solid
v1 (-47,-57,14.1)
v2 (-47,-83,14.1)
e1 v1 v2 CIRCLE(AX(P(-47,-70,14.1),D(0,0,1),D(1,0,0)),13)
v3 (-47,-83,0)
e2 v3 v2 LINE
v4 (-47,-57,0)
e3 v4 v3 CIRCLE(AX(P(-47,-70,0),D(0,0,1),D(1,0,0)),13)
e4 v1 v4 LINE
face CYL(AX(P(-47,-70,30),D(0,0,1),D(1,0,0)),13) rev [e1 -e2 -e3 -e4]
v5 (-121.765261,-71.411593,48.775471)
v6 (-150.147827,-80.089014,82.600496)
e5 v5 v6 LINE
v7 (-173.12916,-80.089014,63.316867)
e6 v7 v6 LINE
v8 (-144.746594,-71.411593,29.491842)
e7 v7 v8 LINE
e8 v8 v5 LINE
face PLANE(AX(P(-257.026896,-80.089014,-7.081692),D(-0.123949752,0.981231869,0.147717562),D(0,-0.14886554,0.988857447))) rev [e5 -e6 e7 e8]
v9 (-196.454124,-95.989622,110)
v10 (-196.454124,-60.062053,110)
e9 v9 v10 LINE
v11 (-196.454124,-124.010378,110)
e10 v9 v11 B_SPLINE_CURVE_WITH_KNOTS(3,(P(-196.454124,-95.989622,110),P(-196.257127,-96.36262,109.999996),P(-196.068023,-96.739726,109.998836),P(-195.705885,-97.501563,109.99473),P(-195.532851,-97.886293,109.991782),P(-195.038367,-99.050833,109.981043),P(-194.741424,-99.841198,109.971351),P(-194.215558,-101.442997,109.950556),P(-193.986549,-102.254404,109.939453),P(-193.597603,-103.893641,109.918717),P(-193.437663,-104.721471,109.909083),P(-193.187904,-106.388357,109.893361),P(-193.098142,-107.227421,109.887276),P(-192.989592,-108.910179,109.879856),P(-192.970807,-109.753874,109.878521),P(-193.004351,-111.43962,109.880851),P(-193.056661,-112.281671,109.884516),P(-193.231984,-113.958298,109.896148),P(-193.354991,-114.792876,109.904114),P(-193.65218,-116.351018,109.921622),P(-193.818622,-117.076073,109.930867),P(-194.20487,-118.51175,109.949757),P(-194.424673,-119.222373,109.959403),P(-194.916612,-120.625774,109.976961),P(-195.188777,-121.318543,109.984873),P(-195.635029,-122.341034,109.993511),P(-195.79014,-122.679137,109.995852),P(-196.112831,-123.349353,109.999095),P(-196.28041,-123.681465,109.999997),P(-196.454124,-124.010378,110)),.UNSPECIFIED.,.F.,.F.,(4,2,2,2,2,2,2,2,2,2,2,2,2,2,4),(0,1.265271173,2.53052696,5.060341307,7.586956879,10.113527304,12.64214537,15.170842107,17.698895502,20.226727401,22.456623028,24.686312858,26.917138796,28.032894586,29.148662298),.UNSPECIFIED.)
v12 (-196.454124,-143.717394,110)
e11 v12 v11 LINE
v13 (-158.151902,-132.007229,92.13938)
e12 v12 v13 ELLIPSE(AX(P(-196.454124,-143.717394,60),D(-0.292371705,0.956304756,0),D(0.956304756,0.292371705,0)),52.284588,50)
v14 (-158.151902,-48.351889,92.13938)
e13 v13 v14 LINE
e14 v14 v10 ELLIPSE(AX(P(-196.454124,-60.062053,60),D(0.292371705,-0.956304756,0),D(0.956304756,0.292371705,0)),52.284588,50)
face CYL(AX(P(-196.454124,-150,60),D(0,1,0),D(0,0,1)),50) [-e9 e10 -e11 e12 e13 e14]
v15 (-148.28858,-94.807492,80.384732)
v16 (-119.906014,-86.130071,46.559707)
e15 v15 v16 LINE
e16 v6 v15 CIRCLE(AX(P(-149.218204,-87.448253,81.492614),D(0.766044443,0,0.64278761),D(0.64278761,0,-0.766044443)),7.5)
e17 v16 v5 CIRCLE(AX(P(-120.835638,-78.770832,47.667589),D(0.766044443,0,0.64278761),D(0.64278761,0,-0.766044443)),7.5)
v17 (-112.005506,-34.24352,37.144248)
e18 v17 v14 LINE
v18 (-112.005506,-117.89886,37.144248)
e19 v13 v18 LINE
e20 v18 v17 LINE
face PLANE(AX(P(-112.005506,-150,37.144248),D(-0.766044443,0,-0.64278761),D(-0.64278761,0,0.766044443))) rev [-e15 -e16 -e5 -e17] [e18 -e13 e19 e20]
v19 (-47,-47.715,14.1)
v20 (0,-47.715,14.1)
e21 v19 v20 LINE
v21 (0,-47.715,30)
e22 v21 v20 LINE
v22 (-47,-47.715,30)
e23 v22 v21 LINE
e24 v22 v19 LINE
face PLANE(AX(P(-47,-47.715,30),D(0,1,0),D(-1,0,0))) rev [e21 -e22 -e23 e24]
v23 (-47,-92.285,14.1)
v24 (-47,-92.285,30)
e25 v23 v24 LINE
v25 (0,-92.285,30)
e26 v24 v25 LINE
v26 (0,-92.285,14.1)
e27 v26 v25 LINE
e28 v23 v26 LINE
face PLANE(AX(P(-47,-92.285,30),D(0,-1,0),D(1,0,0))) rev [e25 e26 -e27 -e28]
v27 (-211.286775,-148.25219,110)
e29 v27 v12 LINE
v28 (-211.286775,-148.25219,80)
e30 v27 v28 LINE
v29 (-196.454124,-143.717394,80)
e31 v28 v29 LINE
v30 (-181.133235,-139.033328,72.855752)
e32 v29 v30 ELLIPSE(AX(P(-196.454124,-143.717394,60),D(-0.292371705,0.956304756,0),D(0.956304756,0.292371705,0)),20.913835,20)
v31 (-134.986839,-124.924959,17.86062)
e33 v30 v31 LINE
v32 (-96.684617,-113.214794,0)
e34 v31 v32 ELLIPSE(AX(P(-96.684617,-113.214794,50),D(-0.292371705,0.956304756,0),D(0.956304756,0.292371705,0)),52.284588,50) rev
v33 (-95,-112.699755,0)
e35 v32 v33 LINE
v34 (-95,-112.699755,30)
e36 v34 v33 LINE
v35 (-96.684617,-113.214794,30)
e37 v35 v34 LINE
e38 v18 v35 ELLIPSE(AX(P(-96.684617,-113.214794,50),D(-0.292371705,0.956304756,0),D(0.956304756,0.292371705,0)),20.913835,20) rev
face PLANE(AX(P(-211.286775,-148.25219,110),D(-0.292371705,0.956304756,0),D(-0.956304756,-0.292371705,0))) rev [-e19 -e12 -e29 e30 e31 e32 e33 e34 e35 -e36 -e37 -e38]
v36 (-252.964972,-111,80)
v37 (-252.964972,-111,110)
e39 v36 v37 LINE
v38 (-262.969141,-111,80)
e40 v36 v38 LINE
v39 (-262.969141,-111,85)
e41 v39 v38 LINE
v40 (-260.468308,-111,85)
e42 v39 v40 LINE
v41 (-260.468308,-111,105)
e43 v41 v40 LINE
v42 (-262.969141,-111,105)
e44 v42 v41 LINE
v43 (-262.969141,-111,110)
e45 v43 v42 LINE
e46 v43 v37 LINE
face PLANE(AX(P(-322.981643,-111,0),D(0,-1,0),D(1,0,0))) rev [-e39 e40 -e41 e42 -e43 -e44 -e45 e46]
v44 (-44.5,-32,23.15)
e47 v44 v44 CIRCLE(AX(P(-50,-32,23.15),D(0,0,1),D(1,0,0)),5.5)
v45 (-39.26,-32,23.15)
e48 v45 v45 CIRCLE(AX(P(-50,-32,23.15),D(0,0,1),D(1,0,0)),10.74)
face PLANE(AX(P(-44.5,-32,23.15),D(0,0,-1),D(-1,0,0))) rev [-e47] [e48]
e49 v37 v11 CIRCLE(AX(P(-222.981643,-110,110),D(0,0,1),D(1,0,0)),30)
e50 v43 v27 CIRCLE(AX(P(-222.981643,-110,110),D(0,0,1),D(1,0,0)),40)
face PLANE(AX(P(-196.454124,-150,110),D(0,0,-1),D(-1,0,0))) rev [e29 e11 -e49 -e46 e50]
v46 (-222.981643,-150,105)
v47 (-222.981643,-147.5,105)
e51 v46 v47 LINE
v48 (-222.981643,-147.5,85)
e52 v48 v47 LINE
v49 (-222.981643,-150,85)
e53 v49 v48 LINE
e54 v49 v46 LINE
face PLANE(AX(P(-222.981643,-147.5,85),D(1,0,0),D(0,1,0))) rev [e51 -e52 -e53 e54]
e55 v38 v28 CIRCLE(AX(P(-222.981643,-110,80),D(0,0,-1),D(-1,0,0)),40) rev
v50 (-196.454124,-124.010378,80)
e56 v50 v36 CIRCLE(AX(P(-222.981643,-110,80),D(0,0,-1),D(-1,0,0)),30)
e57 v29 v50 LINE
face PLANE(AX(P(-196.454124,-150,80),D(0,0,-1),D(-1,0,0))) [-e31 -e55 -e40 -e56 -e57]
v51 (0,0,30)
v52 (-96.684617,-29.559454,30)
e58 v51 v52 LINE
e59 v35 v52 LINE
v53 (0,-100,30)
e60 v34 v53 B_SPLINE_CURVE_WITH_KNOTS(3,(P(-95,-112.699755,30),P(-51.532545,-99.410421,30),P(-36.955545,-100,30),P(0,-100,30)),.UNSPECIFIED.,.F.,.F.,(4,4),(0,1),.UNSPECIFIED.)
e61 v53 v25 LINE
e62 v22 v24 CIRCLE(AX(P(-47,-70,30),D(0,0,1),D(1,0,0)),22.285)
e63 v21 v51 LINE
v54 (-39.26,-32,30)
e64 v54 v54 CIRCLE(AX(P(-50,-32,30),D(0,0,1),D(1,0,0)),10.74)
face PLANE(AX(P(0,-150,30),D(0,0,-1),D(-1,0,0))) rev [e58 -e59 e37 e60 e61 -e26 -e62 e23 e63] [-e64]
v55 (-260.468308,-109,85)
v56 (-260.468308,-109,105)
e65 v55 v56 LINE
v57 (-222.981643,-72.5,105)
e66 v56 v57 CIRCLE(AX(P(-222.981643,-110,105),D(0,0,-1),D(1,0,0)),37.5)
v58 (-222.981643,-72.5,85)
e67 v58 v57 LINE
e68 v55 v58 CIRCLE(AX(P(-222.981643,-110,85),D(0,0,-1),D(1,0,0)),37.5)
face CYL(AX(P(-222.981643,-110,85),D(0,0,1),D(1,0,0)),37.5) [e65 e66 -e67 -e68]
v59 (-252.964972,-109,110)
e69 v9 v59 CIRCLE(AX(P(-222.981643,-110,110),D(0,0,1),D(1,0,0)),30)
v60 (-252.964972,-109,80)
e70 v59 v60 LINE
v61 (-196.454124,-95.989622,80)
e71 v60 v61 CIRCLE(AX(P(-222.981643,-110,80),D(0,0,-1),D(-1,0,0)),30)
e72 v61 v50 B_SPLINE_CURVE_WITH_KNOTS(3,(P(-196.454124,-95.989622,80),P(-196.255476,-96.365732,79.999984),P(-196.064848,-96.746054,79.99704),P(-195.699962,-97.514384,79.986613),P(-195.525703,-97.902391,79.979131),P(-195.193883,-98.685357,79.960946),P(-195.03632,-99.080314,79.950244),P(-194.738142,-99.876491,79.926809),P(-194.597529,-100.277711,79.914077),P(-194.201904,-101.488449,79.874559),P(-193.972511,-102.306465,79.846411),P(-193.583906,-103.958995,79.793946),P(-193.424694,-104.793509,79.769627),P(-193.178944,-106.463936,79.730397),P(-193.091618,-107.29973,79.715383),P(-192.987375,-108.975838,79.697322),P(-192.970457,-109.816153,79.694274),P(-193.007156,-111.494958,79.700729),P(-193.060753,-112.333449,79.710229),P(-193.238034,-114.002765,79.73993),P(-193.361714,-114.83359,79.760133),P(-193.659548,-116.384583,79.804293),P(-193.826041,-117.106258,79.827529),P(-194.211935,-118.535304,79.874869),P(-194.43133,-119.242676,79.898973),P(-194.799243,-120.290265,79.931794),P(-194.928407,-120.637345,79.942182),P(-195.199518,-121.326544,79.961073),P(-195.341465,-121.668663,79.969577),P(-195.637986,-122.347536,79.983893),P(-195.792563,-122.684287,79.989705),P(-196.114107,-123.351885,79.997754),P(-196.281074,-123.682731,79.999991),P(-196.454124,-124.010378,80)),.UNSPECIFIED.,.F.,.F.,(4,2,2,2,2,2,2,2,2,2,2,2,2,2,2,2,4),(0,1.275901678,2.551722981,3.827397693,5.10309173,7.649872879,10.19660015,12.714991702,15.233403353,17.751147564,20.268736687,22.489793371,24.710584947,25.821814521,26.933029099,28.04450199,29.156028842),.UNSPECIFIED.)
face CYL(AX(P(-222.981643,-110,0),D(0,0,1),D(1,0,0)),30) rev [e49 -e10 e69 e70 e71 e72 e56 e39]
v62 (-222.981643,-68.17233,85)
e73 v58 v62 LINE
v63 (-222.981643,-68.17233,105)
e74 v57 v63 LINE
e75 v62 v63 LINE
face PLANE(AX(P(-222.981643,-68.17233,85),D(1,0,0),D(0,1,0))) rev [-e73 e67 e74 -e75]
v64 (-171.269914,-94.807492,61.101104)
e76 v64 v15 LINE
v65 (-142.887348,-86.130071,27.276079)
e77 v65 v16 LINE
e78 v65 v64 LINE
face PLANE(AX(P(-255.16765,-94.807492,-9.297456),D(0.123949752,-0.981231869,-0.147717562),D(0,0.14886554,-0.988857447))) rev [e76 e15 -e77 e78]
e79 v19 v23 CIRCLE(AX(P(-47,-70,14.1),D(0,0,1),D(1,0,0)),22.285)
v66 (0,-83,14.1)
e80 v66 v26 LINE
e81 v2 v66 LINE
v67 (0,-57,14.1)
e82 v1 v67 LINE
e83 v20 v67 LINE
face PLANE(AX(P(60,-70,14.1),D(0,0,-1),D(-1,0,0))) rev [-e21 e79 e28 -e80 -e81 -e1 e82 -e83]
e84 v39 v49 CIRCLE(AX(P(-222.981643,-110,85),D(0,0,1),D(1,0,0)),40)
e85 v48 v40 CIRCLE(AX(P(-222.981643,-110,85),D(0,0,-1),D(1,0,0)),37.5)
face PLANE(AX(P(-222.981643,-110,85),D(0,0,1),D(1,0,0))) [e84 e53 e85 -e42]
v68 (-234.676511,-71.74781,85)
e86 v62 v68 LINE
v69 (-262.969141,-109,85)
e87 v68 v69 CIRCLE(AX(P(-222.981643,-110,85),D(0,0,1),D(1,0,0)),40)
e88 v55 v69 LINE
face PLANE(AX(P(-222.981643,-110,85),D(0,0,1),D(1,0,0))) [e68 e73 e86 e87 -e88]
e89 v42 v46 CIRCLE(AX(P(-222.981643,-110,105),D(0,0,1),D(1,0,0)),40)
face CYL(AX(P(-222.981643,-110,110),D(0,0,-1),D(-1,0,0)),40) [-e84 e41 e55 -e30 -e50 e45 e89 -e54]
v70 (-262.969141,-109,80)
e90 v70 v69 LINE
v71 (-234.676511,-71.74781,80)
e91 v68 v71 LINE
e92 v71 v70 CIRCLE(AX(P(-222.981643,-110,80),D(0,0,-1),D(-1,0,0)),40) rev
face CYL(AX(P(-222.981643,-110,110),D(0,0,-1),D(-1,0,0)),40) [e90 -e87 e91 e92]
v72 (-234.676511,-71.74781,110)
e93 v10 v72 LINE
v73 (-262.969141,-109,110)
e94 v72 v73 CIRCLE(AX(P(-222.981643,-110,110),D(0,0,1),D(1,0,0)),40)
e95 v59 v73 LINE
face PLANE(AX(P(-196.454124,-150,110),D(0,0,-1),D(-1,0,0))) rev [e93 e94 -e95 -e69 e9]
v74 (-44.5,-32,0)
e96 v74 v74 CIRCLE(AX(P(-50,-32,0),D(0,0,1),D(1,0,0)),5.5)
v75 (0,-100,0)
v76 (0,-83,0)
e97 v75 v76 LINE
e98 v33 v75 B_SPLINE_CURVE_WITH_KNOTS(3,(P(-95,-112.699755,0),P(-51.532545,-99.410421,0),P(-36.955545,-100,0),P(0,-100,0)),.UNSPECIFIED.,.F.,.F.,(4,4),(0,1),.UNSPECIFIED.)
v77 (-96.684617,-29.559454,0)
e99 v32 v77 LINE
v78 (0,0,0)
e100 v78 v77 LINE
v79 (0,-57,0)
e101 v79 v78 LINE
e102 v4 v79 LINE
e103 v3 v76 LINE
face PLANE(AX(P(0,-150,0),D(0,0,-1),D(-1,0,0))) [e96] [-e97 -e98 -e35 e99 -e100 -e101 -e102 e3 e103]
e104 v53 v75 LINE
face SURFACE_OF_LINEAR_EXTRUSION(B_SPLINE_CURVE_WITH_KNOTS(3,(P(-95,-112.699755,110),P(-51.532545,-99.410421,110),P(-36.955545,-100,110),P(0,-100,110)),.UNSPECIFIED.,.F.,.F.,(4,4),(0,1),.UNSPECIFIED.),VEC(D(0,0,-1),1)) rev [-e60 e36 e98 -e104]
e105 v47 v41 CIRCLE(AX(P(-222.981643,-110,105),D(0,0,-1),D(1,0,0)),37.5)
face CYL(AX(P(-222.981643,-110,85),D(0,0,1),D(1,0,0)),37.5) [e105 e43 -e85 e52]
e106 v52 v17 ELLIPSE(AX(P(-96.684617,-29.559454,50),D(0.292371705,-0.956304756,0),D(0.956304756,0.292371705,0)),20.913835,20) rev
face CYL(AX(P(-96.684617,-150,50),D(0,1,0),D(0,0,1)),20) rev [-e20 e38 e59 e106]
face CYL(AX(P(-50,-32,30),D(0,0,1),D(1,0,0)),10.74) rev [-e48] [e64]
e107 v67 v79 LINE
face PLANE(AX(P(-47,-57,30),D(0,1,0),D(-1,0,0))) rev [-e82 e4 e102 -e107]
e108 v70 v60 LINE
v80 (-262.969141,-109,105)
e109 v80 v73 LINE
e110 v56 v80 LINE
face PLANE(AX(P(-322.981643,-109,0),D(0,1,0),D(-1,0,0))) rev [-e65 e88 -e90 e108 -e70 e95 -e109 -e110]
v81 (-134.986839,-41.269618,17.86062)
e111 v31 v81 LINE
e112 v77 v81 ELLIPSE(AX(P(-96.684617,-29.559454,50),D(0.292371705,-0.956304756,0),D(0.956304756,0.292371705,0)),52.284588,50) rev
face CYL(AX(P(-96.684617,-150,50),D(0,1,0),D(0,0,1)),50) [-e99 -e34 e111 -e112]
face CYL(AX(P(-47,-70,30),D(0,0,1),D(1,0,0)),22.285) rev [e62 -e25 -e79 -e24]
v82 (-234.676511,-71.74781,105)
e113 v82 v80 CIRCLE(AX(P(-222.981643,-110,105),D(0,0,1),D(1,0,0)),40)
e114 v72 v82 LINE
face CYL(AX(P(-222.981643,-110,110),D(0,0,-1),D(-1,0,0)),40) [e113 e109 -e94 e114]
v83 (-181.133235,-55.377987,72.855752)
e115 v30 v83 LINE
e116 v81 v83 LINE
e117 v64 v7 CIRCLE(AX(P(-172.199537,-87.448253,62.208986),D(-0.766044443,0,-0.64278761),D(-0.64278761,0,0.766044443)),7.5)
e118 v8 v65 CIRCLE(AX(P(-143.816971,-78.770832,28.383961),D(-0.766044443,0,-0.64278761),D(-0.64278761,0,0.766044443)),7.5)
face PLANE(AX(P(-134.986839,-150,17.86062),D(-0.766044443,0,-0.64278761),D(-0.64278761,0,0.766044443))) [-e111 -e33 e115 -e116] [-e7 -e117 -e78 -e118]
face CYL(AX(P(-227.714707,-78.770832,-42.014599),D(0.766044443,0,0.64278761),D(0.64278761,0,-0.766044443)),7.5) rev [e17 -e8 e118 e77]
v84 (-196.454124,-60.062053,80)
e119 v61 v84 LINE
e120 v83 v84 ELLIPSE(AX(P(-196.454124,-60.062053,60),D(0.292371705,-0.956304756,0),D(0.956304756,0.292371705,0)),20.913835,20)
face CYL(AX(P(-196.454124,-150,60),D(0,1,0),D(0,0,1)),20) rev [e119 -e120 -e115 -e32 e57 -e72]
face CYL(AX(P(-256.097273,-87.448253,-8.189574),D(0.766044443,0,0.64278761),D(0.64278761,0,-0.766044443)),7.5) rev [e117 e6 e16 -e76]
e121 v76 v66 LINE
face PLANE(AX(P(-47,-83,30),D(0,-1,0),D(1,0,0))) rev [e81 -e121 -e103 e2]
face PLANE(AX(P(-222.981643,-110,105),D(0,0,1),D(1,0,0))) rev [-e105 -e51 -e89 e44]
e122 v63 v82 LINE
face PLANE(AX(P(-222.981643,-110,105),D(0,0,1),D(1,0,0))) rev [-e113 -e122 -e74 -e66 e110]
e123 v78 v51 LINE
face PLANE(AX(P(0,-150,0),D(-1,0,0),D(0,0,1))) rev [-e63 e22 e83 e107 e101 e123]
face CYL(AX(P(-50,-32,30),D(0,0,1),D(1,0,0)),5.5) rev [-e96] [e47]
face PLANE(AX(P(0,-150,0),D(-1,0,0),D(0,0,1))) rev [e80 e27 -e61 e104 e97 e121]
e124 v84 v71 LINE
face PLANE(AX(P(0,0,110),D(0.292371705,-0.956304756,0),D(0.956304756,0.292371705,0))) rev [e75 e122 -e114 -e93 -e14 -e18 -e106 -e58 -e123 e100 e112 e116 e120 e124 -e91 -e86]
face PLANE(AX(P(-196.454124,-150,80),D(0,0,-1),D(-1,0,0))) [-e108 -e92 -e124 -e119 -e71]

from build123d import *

# Parameters (mm, degrees)
EXTRUDE_THIN1_DEPTH                       = 150
SKETCH2_OUTSIDE_W                         = 349.23
SKETCH2_OUTSIDE_H                         = 219.23
CUT_EXTRUDE1_DEPTH                        = 337.154726279
SKETCH3_R                                 = 30
CUT_EXTRUDE2_DEPTH                        = 323.116973634
CUT_EXTRUDE3_START                        = -15
CUT_EXTRUDE3_DEPTH                        = 10
SKETCH5_W                                 = 100
SKETCH5_H                                 = 2
CUT_EXTRUDE4_DEPTH                        = 323.116973634
CBORE_START                               = 14.1
CBORE_SLOT_FOR_M24_HEX_HEAD_BOLT1_DEPTH   = 15.9
CBORE_SLOT_FOR_M24_HEX_HEAD_BOLT1_2_DEPTH = 14.1
CBORE_FOR_M10_HEX_HEAD_BOLT1_D            = 11
CBORE_FOR_M10_HEX_HEAD_BOLT1_CBORE_D      = 21.48
CBORE_FOR_M10_HEX_HEAD_BOLT1_CBORE_DEPTH  = 6.85
CUT_EXTRUDE5_DEPTH                        = 303.31664336


# Read off the part's stored shape, not the designer's step: CBORE SLOT for M24 Hex Head Bolt1
with BuildPart() as part:
    # Sketch1 → Extrude-Thin1 (new body)
    with BuildSketch(Plane(origin=(0, 0, 0), x_dir=(1, 0, 0), z_dir=(0, 1, 0))):
        with BuildLine():
            Line((0, 0), (-96.684617092, 0))
            ThreePointArc((-96.684617092, 0), (-117.815530179, -4.684610648), (-134.986839248, -17.860619516))
            Line((-134.986839248, -17.860619516), (-181.133234795, -72.855752194))
            ThreePointArc((-181.133234795, -72.855752194), (-188.001758422, -78.126155741), (-196.454123657, -80))
            Line((-196.454123657, -80), (-280, -80))
            Line((-280, -80), (-280, -110))
            Line((-280, -110), (-196.454123657, -110))
            ThreePointArc((-196.454123657, -110), (-175.32321057, -105.315389352), (-158.151901501, -92.139380484))
            Line((-158.151901501, -92.139380484), (-112.005505955, -37.144247806))
            ThreePointArc((-112.005505955, -37.144247806), (-105.136982327, -31.873844259), (-96.684617092, -30))
            Line((-96.684617092, -30), (0, -30))
            Line((0, -30), (0, 0))
        make_face()
    extrude(amount=-EXTRUDE_THIN1_DEPTH)

    # Sketch2 outside → Cut-Extrude1 (cut, through all)
    with BuildSketch(Plane.XY):
        with Locations((-140, -75)):
            Rectangle(SKETCH2_OUTSIDE_W, SKETCH2_OUTSIDE_H)
        with BuildLine():
            Line((0, 0), (-234.676511429, -71.747809761))
            ThreePointArc((-234.676511429, -71.747809761), (-261.233833478, -121.694868189), (-211.286775051, -148.252190239))
            Line((-211.286775051, -148.252190239), (-95, -112.699755258))
            add(Edge.make_bspline(
                [(-95, -112.699755258), (-51.532544729, -99.410420536), (-36.95554526, -100), (0, -100)],
                knots=[0, 0, 0, 0, 1, 1, 1, 1], degree=3))
            Line((0, -100), (0, 0))
        make_face(mode=Mode.SUBTRACT)
    extrude(amount=CUT_EXTRUDE1_DEPTH, mode=Mode.SUBTRACT)

    # Sketch3 → Cut-Extrude2 (cut, through all)
    with BuildSketch(Plane.XY.offset(110)):
        with Locations(Location((-222.98164324, -110, 0), (0, 0, 27.840553026))):
            Circle(SKETCH3_R)
    extrude(amount=-CUT_EXTRUDE2_DEPTH, mode=Mode.SUBTRACT)

    # Sketch4 → Cut-Extrude3 (cut, symmetric)
    with BuildSketch(Plane.XY.offset(110).offset(CUT_EXTRUDE3_START)):
        with BuildLine():
            Line((-222.98164324, -68.172329741), (-222.98164324, -72.5))
            ThreePointArc((-222.98164324, -72.5), (-260.48164324, -110), (-222.98164324, -147.5))
            Line((-222.98164324, -147.5), (-222.98164324, -150))
            ThreePointArc((-222.98164324, -150), (-262.542277774, -115.912376445), (-234.676511429, -71.747809761))
            Line((-234.676511429, -71.747809761), (-222.98164324, -68.172329741))
        make_face()
    extrude(amount=CUT_EXTRUDE3_DEPTH, both=True, mode=Mode.SUBTRACT)

    # Sketch5 → Cut-Extrude4 (cut, through all)
    with BuildSketch(Plane.XY.offset(110)):
        with Locations((-272.98164324, -110)):
            Rectangle(SKETCH5_W, SKETCH5_H)
    extrude(amount=-CUT_EXTRUDE4_DEPTH, mode=Mode.SUBTRACT)

    # CBORE SLOT for M24 Hex Head Bolt1 outlin → CBORE SLOT for M24 Hex Head Bolt1 (cut)
    with BuildSketch(Plane.XY.offset(CBORE_START)):
        with BuildLine():
            Line((0, -47.715), (-47, -47.715))
            ThreePointArc((-47, -47.715), (-69.285, -70), (-47, -92.285))
            Line((-47, -92.285), (0, -92.285))
            Line((0, -92.285), (0, -47.715))
        make_face()
    extrude(amount=CBORE_SLOT_FOR_M24_HEX_HEAD_BOLT1_DEPTH, mode=Mode.SUBTRACT)

    # CBORE SLOT for M24 Hex Head Bolt1 2 outl → CBORE SLOT for M24 Hex Head Bolt1 2 (cut)
    with BuildSketch(Plane.XY):
        with BuildLine():
            Line((0, -83), (0, -57))
            Line((0, -57), (-47, -57))
            ThreePointArc((-47, -57), (-60, -70), (-47, -83))
            Line((-47, -83), (0, -83))
        make_face()
    extrude(amount=CBORE_SLOT_FOR_M24_HEX_HEAD_BOLT1_2_DEPTH, mode=Mode.SUBTRACT)

    # CBORE for M10 Hex Head Bolt1 (through all)
    with Locations(Plane.XY.offset(30)):
        with Locations((-50, -32)):
            CounterBoreHole(CBORE_FOR_M10_HEX_HEAD_BOLT1_D / 2, CBORE_FOR_M10_HEX_HEAD_BOLT1_CBORE_D / 2, CBORE_FOR_M10_HEX_HEAD_BOLT1_CBORE_DEPTH)

    # Sketch11 → Cut-Extrude5 (cut, through all)
    with BuildSketch(Plane(origin=(-47.437557366, 0, -39.80483689), x_dir=(0.6427876096865384, 0, -0.7660444431189788), z_dir=(0.7660444431189788, 0, 0.6427876096865384))):
        with BuildLine():
            Line((-159.78881321, -80.089014291), (-115.633379107, -71.411593064))
            ThreePointArc((-115.633379107, -71.411593064), (-106.827903218, -77.32459521), (-112.740905364, -86.130071099))
            Line((-112.740905364, -86.130071099), (-156.896339468, -94.807492326))
            ThreePointArc((-156.896339468, -94.807492326), (-165.701815356, -88.89449018), (-159.78881321, -80.089014291))
        make_face()
    extrude(amount=-CUT_EXTRUDE5_DEPTH, mode=Mode.SUBTRACT)


solid = part.part
